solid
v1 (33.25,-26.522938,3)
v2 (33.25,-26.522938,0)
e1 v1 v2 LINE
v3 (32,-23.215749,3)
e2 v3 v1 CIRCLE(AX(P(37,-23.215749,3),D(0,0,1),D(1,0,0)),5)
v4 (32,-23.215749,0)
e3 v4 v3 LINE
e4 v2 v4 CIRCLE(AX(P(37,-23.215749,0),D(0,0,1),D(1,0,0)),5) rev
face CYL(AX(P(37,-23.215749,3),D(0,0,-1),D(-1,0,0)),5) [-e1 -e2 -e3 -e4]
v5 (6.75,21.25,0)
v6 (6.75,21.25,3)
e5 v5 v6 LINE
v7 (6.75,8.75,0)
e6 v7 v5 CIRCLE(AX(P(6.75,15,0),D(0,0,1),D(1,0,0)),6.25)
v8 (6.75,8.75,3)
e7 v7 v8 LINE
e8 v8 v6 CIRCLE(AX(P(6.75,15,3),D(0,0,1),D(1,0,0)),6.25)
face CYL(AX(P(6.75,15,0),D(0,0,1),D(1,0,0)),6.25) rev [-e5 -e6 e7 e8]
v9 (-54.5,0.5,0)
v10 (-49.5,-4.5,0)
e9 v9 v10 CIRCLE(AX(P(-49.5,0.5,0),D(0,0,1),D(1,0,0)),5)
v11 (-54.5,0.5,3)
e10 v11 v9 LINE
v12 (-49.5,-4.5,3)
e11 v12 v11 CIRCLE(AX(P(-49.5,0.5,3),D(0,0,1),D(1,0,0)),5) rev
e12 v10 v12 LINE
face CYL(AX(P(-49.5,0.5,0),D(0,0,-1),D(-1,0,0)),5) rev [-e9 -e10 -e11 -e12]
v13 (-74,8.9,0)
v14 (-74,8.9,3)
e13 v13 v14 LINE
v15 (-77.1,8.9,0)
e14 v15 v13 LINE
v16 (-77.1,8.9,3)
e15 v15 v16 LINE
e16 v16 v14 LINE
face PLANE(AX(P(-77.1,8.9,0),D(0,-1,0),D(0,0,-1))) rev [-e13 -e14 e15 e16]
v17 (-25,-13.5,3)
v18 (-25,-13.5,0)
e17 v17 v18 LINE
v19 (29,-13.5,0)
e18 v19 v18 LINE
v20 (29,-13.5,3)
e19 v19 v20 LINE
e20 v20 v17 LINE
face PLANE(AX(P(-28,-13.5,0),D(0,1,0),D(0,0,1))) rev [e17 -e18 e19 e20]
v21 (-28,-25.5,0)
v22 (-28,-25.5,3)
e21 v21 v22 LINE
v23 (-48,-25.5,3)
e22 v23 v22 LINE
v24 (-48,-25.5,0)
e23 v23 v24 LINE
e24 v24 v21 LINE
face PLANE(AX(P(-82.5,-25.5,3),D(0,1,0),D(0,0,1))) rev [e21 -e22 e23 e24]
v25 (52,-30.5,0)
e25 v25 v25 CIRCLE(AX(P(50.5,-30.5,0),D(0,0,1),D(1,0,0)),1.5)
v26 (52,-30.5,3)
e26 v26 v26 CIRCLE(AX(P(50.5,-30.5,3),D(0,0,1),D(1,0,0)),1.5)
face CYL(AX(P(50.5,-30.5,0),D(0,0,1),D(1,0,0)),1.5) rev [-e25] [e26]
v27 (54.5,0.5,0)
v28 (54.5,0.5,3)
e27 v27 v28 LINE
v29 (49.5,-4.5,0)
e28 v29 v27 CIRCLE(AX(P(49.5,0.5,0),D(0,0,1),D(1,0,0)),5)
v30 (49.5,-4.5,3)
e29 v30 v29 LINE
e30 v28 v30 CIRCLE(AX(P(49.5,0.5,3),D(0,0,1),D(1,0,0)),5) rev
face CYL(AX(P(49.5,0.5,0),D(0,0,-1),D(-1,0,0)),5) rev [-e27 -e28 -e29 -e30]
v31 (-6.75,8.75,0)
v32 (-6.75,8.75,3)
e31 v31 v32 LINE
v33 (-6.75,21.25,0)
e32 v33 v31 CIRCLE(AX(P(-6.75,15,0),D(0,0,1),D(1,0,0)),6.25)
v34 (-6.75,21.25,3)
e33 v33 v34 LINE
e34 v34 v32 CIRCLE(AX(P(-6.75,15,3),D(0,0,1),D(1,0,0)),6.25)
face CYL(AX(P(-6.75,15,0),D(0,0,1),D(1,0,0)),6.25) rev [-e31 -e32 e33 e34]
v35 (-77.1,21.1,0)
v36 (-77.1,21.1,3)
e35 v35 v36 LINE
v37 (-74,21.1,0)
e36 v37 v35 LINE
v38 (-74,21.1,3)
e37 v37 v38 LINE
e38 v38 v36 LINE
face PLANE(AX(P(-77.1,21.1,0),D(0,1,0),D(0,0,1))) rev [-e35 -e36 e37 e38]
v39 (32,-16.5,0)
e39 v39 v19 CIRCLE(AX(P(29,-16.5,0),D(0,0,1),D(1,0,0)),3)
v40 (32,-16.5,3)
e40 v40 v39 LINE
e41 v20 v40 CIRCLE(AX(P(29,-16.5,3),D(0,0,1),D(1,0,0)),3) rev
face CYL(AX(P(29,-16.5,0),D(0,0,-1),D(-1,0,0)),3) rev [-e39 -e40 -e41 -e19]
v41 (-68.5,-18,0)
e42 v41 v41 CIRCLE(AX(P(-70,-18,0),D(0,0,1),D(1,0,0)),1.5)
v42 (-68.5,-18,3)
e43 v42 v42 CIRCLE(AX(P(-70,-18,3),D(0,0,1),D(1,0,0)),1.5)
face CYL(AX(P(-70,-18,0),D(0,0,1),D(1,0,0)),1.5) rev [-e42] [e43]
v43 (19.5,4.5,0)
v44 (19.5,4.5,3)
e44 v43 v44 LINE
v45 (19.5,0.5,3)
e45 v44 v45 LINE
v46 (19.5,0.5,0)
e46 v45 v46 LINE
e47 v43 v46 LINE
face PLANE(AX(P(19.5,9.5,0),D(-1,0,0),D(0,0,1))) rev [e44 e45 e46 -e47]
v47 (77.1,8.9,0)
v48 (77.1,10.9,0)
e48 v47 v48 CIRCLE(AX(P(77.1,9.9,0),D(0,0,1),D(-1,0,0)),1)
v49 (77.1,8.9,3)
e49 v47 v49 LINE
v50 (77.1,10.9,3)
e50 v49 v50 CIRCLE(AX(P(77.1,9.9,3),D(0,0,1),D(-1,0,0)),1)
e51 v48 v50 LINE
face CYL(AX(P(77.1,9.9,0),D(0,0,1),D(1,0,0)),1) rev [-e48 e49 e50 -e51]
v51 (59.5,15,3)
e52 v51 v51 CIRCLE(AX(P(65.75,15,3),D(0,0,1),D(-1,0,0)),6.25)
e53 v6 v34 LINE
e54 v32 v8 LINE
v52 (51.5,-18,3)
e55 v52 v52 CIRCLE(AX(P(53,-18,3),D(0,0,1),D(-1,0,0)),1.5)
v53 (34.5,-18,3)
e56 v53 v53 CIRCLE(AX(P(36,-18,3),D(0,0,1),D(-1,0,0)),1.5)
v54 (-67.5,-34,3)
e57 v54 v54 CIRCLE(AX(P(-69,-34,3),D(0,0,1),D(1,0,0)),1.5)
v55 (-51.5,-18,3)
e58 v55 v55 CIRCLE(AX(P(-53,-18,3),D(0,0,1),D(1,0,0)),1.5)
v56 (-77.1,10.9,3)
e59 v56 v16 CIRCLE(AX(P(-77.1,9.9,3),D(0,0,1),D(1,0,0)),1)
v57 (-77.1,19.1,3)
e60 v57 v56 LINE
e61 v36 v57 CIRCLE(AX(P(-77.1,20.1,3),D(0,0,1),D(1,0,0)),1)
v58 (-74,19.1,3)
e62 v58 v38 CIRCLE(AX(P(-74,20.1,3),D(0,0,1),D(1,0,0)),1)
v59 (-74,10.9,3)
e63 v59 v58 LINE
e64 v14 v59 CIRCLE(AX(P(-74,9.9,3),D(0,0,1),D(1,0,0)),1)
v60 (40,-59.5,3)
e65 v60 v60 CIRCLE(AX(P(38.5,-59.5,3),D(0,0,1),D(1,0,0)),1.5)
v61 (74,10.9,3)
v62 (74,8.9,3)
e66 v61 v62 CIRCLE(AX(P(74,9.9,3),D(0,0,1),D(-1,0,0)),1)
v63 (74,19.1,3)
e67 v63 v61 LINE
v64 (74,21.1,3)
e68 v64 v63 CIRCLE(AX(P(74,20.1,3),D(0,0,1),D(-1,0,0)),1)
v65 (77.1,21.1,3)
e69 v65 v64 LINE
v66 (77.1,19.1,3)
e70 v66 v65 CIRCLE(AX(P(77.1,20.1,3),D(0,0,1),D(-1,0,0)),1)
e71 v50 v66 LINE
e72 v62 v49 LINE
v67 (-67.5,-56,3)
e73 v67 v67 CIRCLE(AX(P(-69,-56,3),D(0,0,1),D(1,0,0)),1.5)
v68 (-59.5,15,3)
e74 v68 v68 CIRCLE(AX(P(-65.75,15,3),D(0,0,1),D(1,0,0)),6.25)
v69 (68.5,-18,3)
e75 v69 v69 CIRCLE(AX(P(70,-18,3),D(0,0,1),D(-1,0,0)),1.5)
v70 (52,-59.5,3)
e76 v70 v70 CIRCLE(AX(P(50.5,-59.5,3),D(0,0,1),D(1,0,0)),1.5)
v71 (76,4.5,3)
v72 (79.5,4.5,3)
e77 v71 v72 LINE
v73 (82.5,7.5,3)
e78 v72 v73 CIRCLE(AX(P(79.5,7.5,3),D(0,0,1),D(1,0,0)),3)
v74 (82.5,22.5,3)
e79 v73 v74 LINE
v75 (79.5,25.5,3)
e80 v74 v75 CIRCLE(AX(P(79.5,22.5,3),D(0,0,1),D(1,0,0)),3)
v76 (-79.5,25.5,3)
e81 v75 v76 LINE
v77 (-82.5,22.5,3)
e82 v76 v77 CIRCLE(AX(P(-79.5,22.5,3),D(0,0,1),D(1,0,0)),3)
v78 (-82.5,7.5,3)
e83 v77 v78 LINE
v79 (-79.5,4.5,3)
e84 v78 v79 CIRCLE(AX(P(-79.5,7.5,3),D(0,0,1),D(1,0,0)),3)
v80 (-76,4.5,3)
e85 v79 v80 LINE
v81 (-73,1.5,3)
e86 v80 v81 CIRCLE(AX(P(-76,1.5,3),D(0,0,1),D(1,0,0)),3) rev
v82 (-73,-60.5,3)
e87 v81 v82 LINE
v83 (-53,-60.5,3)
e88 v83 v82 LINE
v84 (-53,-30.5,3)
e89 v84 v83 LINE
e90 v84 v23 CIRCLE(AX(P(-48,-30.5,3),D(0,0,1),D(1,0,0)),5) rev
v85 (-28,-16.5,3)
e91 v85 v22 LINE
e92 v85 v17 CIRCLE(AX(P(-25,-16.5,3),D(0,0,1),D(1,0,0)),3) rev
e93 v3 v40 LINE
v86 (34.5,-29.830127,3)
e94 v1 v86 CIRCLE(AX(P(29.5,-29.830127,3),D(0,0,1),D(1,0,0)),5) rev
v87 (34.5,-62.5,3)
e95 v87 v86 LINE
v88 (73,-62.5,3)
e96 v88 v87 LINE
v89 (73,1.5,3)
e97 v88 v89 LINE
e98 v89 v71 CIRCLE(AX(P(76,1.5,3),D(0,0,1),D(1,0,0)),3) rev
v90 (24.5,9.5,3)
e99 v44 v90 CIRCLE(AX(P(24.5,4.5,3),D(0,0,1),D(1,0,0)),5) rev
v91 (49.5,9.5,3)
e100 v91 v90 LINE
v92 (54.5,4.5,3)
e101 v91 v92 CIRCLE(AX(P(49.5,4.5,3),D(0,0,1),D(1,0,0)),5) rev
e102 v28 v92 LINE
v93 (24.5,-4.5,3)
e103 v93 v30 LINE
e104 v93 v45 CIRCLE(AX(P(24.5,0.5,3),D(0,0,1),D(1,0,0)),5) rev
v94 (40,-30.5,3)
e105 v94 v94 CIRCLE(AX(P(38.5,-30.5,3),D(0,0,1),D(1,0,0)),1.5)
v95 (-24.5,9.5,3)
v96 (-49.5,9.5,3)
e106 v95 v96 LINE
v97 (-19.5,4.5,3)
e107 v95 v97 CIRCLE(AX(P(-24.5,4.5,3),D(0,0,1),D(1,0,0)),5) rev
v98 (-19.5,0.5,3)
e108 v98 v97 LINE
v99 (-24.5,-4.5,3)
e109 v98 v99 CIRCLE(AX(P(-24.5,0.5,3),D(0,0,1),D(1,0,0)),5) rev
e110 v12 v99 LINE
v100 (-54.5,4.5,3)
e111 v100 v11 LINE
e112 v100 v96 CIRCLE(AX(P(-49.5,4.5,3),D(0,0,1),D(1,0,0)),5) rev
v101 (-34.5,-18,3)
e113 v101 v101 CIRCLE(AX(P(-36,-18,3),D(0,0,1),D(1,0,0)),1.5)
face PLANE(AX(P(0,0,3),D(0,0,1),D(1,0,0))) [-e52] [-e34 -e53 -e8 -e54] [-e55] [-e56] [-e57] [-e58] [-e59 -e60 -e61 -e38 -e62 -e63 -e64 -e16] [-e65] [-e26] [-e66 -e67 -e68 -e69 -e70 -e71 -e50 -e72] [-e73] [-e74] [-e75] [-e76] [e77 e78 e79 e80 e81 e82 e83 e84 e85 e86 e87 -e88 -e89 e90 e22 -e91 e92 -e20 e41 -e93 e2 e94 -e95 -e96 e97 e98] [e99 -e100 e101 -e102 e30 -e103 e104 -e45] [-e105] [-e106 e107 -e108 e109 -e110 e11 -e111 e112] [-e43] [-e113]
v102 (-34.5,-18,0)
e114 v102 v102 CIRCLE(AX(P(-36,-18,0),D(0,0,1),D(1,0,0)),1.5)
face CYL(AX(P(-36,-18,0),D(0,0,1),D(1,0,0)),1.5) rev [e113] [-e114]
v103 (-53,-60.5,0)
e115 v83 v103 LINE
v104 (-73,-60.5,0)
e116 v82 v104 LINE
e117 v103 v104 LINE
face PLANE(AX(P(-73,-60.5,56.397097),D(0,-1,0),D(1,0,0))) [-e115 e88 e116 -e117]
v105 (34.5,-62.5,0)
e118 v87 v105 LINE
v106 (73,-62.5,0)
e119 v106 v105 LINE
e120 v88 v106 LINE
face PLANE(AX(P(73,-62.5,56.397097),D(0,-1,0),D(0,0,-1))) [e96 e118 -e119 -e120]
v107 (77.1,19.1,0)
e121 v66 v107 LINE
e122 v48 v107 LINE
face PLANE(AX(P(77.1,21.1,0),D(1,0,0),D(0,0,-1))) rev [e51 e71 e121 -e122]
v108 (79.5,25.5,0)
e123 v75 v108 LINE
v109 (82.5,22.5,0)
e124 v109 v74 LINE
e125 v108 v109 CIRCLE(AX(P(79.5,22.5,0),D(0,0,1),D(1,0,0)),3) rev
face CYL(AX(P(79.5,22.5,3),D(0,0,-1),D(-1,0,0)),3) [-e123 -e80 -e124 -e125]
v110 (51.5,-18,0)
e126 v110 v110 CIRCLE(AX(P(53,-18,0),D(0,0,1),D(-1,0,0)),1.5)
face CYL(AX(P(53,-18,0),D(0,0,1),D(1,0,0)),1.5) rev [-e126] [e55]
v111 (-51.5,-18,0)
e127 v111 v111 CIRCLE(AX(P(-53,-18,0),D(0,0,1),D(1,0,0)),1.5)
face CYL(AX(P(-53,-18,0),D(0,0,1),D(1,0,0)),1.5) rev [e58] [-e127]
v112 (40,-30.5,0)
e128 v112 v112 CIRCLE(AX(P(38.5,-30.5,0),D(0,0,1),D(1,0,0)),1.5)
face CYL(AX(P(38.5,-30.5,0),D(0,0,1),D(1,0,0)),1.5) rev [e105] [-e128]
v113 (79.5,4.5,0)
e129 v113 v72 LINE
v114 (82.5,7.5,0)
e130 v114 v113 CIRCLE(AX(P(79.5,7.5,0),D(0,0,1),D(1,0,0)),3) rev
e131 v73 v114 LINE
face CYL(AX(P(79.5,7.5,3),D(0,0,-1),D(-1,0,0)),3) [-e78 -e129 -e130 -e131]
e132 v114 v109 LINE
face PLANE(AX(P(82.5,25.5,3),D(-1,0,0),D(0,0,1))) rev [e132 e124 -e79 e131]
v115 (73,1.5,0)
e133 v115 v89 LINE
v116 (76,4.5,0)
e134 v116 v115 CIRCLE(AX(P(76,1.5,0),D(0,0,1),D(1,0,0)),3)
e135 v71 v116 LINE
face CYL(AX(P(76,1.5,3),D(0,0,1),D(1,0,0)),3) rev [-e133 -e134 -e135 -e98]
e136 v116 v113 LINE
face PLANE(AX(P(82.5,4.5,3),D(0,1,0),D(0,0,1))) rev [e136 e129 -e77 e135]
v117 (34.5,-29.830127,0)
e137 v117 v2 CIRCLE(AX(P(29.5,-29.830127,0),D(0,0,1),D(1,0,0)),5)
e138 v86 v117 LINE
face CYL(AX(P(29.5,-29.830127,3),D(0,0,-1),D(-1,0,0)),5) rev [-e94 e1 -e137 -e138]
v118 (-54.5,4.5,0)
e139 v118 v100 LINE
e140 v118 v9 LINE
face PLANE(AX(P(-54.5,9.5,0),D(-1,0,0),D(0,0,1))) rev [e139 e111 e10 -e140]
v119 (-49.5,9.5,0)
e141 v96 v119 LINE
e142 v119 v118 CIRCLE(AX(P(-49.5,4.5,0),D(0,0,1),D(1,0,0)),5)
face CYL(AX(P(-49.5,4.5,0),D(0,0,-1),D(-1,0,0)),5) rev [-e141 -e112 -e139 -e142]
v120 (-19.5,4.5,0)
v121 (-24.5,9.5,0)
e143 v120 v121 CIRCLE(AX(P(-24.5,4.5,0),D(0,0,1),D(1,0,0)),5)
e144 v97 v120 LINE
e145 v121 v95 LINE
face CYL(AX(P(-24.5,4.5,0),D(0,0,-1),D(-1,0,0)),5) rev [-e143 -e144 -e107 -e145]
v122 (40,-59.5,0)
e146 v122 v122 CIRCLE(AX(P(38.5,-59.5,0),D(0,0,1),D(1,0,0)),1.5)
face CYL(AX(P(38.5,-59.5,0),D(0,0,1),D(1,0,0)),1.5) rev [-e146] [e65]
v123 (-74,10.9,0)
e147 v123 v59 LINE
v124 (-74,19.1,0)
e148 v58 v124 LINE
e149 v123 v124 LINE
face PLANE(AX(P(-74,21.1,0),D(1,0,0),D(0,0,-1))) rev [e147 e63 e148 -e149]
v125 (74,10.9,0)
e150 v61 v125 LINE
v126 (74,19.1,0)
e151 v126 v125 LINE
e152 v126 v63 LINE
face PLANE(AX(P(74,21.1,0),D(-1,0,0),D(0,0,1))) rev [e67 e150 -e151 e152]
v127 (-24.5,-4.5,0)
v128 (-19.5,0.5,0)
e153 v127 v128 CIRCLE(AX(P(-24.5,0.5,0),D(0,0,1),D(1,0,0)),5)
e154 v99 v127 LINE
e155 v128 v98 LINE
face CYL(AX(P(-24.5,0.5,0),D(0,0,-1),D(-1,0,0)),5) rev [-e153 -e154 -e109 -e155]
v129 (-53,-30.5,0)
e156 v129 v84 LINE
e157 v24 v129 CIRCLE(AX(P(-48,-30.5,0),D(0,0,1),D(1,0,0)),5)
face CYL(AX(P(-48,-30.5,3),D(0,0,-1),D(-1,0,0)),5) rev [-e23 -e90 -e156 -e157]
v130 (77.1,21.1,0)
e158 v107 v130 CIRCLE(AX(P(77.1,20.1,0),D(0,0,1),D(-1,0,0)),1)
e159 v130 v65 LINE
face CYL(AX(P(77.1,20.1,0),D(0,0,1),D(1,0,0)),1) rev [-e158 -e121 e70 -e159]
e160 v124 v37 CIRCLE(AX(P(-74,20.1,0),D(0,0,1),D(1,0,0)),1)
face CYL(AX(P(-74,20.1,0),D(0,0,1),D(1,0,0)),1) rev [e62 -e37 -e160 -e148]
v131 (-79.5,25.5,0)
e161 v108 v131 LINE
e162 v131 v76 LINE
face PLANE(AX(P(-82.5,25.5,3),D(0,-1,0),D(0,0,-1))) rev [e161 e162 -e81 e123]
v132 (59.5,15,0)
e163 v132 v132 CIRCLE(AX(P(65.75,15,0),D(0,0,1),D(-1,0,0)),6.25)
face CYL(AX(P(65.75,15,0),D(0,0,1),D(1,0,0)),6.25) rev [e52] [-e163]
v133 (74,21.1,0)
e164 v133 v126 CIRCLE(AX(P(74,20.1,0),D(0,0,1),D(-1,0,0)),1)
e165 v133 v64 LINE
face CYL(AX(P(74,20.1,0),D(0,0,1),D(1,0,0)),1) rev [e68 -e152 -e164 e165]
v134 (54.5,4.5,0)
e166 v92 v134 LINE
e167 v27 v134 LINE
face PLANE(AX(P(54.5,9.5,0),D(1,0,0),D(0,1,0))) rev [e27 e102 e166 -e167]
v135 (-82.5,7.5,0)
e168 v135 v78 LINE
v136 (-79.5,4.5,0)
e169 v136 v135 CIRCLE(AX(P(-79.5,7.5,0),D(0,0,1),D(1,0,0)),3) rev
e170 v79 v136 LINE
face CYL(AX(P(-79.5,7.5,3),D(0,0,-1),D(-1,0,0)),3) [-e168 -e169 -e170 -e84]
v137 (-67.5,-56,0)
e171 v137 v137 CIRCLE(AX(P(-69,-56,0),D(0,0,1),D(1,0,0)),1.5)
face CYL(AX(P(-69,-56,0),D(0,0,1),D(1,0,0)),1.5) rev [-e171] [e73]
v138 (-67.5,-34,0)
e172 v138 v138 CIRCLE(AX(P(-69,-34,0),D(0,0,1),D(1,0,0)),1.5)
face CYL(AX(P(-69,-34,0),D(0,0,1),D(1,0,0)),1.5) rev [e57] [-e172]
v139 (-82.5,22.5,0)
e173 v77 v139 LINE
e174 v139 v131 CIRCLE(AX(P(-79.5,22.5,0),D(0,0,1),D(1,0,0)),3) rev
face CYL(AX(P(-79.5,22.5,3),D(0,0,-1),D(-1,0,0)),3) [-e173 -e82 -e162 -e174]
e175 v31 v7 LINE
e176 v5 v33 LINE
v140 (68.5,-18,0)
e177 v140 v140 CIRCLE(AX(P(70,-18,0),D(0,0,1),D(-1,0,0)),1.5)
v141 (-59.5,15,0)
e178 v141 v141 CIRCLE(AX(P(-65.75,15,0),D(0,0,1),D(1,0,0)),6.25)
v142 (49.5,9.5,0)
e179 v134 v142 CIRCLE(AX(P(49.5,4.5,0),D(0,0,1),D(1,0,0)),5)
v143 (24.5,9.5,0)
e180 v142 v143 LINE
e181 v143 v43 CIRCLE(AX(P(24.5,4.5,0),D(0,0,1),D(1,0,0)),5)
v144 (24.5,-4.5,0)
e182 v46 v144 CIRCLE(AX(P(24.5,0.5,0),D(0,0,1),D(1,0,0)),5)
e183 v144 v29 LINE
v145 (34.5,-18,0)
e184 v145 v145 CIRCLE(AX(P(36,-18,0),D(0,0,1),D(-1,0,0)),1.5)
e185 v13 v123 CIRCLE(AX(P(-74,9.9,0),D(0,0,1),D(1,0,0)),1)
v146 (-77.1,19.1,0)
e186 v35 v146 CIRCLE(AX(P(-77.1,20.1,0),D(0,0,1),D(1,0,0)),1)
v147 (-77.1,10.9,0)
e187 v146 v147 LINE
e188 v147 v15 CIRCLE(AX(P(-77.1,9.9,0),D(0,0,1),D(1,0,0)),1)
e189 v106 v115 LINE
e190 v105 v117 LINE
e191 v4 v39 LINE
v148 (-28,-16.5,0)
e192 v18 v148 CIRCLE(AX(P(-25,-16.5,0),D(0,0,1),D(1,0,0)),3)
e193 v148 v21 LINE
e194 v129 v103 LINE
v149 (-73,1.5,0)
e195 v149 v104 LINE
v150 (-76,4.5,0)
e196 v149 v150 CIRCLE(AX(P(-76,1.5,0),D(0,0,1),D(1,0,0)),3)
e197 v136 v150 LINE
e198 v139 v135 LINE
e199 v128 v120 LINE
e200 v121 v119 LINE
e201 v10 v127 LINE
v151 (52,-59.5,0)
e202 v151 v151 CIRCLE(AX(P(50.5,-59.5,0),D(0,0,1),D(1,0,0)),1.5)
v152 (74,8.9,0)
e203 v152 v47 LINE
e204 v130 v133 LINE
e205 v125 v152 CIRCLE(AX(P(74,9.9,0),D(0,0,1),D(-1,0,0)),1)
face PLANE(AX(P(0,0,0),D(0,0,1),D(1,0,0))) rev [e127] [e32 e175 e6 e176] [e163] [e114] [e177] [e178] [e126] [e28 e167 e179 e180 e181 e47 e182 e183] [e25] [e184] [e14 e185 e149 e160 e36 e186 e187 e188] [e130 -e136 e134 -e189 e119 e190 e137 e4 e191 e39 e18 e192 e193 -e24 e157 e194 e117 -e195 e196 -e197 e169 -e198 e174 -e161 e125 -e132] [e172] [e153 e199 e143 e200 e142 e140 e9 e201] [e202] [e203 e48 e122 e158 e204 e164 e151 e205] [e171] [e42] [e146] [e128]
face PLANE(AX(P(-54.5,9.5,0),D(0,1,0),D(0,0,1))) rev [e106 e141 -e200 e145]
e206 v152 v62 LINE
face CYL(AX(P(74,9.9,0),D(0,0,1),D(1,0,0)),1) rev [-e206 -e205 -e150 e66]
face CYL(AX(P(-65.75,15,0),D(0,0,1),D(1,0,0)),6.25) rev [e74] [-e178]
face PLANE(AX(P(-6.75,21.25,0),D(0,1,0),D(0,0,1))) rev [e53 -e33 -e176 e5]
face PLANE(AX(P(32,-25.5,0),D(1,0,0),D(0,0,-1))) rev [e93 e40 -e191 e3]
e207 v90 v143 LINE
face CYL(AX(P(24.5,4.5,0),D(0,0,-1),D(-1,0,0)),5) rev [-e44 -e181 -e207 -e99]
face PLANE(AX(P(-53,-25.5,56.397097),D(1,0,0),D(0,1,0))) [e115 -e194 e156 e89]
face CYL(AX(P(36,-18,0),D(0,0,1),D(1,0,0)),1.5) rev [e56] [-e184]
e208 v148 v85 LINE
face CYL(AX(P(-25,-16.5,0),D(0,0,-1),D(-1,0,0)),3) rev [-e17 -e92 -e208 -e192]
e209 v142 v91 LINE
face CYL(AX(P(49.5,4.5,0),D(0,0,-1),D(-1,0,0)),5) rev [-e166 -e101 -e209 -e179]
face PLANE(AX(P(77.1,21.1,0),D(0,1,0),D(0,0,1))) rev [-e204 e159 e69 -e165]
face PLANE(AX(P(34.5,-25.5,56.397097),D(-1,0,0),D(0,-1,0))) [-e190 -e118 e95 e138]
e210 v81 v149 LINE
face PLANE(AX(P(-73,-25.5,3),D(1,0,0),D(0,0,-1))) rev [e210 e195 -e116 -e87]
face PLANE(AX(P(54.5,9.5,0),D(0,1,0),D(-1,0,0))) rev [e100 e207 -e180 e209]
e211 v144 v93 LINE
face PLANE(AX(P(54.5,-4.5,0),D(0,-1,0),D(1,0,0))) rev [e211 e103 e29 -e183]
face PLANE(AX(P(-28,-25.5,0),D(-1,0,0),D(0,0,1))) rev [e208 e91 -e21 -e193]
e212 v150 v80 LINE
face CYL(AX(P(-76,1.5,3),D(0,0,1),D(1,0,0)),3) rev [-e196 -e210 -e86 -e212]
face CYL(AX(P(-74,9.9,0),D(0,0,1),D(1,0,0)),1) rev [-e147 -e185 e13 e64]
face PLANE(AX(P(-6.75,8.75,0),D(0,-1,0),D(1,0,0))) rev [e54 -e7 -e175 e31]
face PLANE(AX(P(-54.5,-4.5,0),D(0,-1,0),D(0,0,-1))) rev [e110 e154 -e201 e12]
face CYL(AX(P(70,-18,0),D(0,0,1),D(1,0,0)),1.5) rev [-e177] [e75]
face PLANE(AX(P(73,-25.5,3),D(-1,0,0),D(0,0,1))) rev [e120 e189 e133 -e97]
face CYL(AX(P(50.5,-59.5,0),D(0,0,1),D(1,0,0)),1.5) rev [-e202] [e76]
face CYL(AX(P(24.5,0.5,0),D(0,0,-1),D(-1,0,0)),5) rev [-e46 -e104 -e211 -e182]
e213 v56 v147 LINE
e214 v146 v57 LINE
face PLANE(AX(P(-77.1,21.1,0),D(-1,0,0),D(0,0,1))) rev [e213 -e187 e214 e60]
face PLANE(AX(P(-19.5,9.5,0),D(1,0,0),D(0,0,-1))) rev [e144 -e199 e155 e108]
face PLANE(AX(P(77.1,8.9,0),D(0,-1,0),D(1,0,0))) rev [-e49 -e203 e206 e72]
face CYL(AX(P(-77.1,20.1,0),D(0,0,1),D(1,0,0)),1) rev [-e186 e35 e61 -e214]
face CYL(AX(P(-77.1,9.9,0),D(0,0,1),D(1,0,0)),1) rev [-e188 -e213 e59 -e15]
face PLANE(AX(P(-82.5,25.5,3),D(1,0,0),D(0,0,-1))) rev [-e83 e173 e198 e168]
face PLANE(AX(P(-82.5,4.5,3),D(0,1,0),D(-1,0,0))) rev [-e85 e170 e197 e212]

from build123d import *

# Parameters (mm, degrees)
SKETCH_1_W          = 165
SKETCH_1_H          = 51
EXTRUDE_1_DEPTH     = 3
SKETCH_2_R          = 1.5
CUT_EXTRUDE_1_DEPTH = 87.403124943
SKETCH_3_R          = 6.25
SKETCH_3_W          = 3.1
SKETCH_3_H          = 12.2
CUT_EXTRUDE_2_DEPTH = 87.403124943
SKETCH_5_W          = 9.5
SKETCH_5_H          = 30
CUT_EXTRUDE_4_DEPTH = 87.403124943
FILLET_1_R          = 3
SKETCH_6_W          = 20
SKETCH_6_H          = 35
SKETCH_6_W_2        = 38.5
SKETCH_6_H_2        = 37
EXTRUDE_2_DEPTH     = 3
SKETCH_4_R          = 1
CUT_EXTRUDE_3_DEPTH = 104.544676348
SKETCH_8_R          = 1.5
CUT_EXTRUDE_6_DEPTH = 104.544676348
FILLET_2_R          = 5
SKETCH_10_W         = 35
SKETCH_10_H         = 14
CUT_EXTRUDE_8_DEPTH = 104.544676348
FILLET_3_R          = 5
SKETCH_11_W         = 60
SKETCH_11_H         = 12
CUT_EXTRUDE_9_DEPTH = 104.544676348
FILLET_4_R          = 3
FILLET_5_R          = 5
FILLET_6_R          = 5


with BuildPart() as part:
    # 草图1 → 凸台-拉伸1 (new body)
    with BuildSketch(Plane.XY):
        Rectangle(SKETCH_1_W, SKETCH_1_H)
    extrude(amount=EXTRUDE_1_DEPTH)

    # 草图2 → 切除-拉伸1 (cut, through all)
    with BuildSketch(Plane.XY.offset(3)):
        with Locations((-53, -18)):
            Circle(SKETCH_2_R)
        with Locations((-36, -18)):
            Circle(SKETCH_2_R)
        with Locations(Location((36, -18, 0), (0, 0, 180))):
            Circle(SKETCH_2_R)
        with Locations(Location((53, -18, 0), (0, 0, 180))):
            Circle(SKETCH_2_R)
        with Locations((-70, -18)):
            Circle(SKETCH_2_R)
        with Locations(Location((70, -18, 0), (0, 0, 180))):
            Circle(SKETCH_2_R)
    extrude(amount=-CUT_EXTRUDE_1_DEPTH, mode=Mode.SUBTRACT)

    # 草图3 → 切除-拉伸2 (cut, through all)
    with BuildSketch(Plane.XY.offset(3)):
        with Locations((-65.75, 15)):
            Circle(SKETCH_3_R)
        with Locations(Location((65.75, 15, 0), (0, 0, 180))):
            Circle(SKETCH_3_R)
        with BuildLine():
            Line((-6.75, 21.25), (6.75, 21.25))
            ThreePointArc((6.75, 21.25), (13, 15), (6.75, 8.75))
            Line((6.75, 8.75), (-6.75, 8.75))
            ThreePointArc((-6.75, 8.75), (-13, 15), (-6.75, 21.25))
        make_face()
        with Locations((-75.55, 15)):
            Rectangle(SKETCH_3_W, SKETCH_3_H)
        with Locations((75.55, 15)):
            Rectangle(SKETCH_3_W, SKETCH_3_H)
    extrude(amount=-CUT_EXTRUDE_2_DEPTH, mode=Mode.SUBTRACT)

    # 草图5 → 切除-拉伸4 (cut, through all)
    with BuildSketch(Plane(origin=(0, 0, 0), x_dir=(-1, 0, 0), z_dir=(0, 0, -1))):
        with Locations((-77.75, -10.5)):
            Rectangle(SKETCH_5_W, SKETCH_5_H)
        with Locations((77.75, -10.5)):
            Rectangle(SKETCH_5_W, SKETCH_5_H)
    extrude(amount=-CUT_EXTRUDE_4_DEPTH, mode=Mode.SUBTRACT)

    # 圆角1
    fillet_1_edges = [part.edges().sort_by_distance(p)[0] for p in [
        (82.5, 4.5, 1.5),
        (73, 4.5, 1.5),
        (-73, 4.5, 1.5),
        (-82.5, 4.5, 1.5),
        (-82.5, 25.5, 1.5),
        (82.5, 25.5, 1.5),
    ]]
    fillet(fillet_1_edges, radius=FILLET_1_R)

    # 草图6 → 凸台-拉伸2 (add)
    with BuildSketch(Plane(origin=(0, 0, 0), x_dir=(-1, 0, 0), z_dir=(0, 0, -1))):
        with Locations((63, -43)):
            Rectangle(SKETCH_6_W, SKETCH_6_H)
        with Locations((-53.75, -44)):
            Rectangle(SKETCH_6_W_2, SKETCH_6_H_2)
    extrude(amount=-EXTRUDE_2_DEPTH)

    # 草图4 → 切除-拉伸3 (cut, through all)
    with BuildSketch(Plane.XY.offset(3)):
        with Locations((-74, 20.1)):
            Circle(SKETCH_4_R)
        with Locations((-74, 9.9)):
            Circle(SKETCH_4_R)
        with Locations((-77.1, 9.9)):
            Circle(SKETCH_4_R)
        with Locations((-77.1, 20.1)):
            Circle(SKETCH_4_R)
        with Locations((77.1, 20.1)):
            Circle(SKETCH_4_R)
        with Locations((77.1, 9.9)):
            Circle(SKETCH_4_R)
        with Locations((74, 9.9)):
            Circle(SKETCH_4_R)
        with Locations((74, 20.1)):
            Circle(SKETCH_4_R)
    extrude(amount=-CUT_EXTRUDE_3_DEPTH, mode=Mode.SUBTRACT)

    # 草图8 → 切除-拉伸6 (cut, through all)
    with BuildSketch(Plane.XY.offset(3)):
        with Locations((-69, -56)):
            Circle(SKETCH_8_R)
        with Locations((-69, -34)):
            Circle(SKETCH_8_R)
        with Locations((38.5, -30.5)):
            Circle(SKETCH_8_R)
        with Locations((38.5, -59.5)):
            Circle(SKETCH_8_R)
        with Locations((50.5, -59.5)):
            Circle(SKETCH_8_R)
        with Locations((50.5, -30.5)):
            Circle(SKETCH_8_R)
    extrude(amount=-CUT_EXTRUDE_6_DEPTH, mode=Mode.SUBTRACT)

    # 圆角2
    fillet_2_edges = [part.edges().sort_by_distance(p)[0] for p in [
        (-53, -25.5, 1.5),
    ]]
    fillet(fillet_2_edges, radius=FILLET_2_R)

    # 草图10 → 切除-拉伸8 (cut, through all)
    with BuildSketch(Plane.XY.offset(3)):
        with Locations((37, 2.5)):
            Rectangle(SKETCH_10_W, SKETCH_10_H)
        with Locations((-37, 2.5)):
            Rectangle(SKETCH_10_W, SKETCH_10_H)
    extrude(amount=-CUT_EXTRUDE_8_DEPTH, mode=Mode.SUBTRACT)

    # 圆角3
    fillet_3_edges = [part.edges().sort_by_distance(p)[0] for p in [
        (-19.5, 9.5, 1.5),
        (-19.5, -4.5, 1.5),
        (-54.5, -4.5, 1.5),
        (-54.5, 9.5, 1.5),
        (54.5, 9.5, 1.5),
        (54.5, -4.5, 1.5),
        (19.5, -4.5, 1.5),
        (19.5, 9.5, 1.5),
    ]]
    fillet(fillet_3_edges, radius=FILLET_3_R)

    # 草图11 → 切除-拉伸9 (cut, through all)
    with BuildSketch(Plane.XY.offset(3)):
        with Locations((2, -19.5)):
            Rectangle(SKETCH_11_W, SKETCH_11_H)
    extrude(amount=-CUT_EXTRUDE_9_DEPTH, mode=Mode.SUBTRACT)

    # 圆角4
    fillet_4_edges = [part.edges().sort_by_distance(p)[0] for p in [
        (-28, -13.5, 1.5),
        (32, -13.5, 1.5),
    ]]
    fillet(fillet_4_edges, radius=FILLET_4_R)

    # 圆角5
    # the kernel refuses this fillet: 5 mm, written as the material it adds along each edge
    with BuildSketch(Plane(origin=(34.5, -25.5, 0), x_dir=(-1, 0, 0), z_dir=(0, 0, 1))) as fillet_5_piece_1:
        with BuildLine():
            CenterArc((5, 4.330127019), FILLET_5_R, 180, 60)
            Line((0, 4.330127019), (-0.1, 4.330127019))
            Line((-0.1, 4.330127019), (-0.1, 0))
            Line((-0.1, 0), (0, -0.1))
            ThreePointArc((0, -0.1), (1.25, -0.1), (2.45, -0.08660254))
            Line((2.45, -0.08660254), (2.5, 0))
        make_face()
    extrude(amount=3)

    # 圆角6
    fillet_6_edges = [part.edges().sort_by_distance(p)[0] for p in [
        (32, -25.5, 1.5),
    ]]
    fillet(fillet_6_edges, radius=FILLET_6_R)


solid = part.part
